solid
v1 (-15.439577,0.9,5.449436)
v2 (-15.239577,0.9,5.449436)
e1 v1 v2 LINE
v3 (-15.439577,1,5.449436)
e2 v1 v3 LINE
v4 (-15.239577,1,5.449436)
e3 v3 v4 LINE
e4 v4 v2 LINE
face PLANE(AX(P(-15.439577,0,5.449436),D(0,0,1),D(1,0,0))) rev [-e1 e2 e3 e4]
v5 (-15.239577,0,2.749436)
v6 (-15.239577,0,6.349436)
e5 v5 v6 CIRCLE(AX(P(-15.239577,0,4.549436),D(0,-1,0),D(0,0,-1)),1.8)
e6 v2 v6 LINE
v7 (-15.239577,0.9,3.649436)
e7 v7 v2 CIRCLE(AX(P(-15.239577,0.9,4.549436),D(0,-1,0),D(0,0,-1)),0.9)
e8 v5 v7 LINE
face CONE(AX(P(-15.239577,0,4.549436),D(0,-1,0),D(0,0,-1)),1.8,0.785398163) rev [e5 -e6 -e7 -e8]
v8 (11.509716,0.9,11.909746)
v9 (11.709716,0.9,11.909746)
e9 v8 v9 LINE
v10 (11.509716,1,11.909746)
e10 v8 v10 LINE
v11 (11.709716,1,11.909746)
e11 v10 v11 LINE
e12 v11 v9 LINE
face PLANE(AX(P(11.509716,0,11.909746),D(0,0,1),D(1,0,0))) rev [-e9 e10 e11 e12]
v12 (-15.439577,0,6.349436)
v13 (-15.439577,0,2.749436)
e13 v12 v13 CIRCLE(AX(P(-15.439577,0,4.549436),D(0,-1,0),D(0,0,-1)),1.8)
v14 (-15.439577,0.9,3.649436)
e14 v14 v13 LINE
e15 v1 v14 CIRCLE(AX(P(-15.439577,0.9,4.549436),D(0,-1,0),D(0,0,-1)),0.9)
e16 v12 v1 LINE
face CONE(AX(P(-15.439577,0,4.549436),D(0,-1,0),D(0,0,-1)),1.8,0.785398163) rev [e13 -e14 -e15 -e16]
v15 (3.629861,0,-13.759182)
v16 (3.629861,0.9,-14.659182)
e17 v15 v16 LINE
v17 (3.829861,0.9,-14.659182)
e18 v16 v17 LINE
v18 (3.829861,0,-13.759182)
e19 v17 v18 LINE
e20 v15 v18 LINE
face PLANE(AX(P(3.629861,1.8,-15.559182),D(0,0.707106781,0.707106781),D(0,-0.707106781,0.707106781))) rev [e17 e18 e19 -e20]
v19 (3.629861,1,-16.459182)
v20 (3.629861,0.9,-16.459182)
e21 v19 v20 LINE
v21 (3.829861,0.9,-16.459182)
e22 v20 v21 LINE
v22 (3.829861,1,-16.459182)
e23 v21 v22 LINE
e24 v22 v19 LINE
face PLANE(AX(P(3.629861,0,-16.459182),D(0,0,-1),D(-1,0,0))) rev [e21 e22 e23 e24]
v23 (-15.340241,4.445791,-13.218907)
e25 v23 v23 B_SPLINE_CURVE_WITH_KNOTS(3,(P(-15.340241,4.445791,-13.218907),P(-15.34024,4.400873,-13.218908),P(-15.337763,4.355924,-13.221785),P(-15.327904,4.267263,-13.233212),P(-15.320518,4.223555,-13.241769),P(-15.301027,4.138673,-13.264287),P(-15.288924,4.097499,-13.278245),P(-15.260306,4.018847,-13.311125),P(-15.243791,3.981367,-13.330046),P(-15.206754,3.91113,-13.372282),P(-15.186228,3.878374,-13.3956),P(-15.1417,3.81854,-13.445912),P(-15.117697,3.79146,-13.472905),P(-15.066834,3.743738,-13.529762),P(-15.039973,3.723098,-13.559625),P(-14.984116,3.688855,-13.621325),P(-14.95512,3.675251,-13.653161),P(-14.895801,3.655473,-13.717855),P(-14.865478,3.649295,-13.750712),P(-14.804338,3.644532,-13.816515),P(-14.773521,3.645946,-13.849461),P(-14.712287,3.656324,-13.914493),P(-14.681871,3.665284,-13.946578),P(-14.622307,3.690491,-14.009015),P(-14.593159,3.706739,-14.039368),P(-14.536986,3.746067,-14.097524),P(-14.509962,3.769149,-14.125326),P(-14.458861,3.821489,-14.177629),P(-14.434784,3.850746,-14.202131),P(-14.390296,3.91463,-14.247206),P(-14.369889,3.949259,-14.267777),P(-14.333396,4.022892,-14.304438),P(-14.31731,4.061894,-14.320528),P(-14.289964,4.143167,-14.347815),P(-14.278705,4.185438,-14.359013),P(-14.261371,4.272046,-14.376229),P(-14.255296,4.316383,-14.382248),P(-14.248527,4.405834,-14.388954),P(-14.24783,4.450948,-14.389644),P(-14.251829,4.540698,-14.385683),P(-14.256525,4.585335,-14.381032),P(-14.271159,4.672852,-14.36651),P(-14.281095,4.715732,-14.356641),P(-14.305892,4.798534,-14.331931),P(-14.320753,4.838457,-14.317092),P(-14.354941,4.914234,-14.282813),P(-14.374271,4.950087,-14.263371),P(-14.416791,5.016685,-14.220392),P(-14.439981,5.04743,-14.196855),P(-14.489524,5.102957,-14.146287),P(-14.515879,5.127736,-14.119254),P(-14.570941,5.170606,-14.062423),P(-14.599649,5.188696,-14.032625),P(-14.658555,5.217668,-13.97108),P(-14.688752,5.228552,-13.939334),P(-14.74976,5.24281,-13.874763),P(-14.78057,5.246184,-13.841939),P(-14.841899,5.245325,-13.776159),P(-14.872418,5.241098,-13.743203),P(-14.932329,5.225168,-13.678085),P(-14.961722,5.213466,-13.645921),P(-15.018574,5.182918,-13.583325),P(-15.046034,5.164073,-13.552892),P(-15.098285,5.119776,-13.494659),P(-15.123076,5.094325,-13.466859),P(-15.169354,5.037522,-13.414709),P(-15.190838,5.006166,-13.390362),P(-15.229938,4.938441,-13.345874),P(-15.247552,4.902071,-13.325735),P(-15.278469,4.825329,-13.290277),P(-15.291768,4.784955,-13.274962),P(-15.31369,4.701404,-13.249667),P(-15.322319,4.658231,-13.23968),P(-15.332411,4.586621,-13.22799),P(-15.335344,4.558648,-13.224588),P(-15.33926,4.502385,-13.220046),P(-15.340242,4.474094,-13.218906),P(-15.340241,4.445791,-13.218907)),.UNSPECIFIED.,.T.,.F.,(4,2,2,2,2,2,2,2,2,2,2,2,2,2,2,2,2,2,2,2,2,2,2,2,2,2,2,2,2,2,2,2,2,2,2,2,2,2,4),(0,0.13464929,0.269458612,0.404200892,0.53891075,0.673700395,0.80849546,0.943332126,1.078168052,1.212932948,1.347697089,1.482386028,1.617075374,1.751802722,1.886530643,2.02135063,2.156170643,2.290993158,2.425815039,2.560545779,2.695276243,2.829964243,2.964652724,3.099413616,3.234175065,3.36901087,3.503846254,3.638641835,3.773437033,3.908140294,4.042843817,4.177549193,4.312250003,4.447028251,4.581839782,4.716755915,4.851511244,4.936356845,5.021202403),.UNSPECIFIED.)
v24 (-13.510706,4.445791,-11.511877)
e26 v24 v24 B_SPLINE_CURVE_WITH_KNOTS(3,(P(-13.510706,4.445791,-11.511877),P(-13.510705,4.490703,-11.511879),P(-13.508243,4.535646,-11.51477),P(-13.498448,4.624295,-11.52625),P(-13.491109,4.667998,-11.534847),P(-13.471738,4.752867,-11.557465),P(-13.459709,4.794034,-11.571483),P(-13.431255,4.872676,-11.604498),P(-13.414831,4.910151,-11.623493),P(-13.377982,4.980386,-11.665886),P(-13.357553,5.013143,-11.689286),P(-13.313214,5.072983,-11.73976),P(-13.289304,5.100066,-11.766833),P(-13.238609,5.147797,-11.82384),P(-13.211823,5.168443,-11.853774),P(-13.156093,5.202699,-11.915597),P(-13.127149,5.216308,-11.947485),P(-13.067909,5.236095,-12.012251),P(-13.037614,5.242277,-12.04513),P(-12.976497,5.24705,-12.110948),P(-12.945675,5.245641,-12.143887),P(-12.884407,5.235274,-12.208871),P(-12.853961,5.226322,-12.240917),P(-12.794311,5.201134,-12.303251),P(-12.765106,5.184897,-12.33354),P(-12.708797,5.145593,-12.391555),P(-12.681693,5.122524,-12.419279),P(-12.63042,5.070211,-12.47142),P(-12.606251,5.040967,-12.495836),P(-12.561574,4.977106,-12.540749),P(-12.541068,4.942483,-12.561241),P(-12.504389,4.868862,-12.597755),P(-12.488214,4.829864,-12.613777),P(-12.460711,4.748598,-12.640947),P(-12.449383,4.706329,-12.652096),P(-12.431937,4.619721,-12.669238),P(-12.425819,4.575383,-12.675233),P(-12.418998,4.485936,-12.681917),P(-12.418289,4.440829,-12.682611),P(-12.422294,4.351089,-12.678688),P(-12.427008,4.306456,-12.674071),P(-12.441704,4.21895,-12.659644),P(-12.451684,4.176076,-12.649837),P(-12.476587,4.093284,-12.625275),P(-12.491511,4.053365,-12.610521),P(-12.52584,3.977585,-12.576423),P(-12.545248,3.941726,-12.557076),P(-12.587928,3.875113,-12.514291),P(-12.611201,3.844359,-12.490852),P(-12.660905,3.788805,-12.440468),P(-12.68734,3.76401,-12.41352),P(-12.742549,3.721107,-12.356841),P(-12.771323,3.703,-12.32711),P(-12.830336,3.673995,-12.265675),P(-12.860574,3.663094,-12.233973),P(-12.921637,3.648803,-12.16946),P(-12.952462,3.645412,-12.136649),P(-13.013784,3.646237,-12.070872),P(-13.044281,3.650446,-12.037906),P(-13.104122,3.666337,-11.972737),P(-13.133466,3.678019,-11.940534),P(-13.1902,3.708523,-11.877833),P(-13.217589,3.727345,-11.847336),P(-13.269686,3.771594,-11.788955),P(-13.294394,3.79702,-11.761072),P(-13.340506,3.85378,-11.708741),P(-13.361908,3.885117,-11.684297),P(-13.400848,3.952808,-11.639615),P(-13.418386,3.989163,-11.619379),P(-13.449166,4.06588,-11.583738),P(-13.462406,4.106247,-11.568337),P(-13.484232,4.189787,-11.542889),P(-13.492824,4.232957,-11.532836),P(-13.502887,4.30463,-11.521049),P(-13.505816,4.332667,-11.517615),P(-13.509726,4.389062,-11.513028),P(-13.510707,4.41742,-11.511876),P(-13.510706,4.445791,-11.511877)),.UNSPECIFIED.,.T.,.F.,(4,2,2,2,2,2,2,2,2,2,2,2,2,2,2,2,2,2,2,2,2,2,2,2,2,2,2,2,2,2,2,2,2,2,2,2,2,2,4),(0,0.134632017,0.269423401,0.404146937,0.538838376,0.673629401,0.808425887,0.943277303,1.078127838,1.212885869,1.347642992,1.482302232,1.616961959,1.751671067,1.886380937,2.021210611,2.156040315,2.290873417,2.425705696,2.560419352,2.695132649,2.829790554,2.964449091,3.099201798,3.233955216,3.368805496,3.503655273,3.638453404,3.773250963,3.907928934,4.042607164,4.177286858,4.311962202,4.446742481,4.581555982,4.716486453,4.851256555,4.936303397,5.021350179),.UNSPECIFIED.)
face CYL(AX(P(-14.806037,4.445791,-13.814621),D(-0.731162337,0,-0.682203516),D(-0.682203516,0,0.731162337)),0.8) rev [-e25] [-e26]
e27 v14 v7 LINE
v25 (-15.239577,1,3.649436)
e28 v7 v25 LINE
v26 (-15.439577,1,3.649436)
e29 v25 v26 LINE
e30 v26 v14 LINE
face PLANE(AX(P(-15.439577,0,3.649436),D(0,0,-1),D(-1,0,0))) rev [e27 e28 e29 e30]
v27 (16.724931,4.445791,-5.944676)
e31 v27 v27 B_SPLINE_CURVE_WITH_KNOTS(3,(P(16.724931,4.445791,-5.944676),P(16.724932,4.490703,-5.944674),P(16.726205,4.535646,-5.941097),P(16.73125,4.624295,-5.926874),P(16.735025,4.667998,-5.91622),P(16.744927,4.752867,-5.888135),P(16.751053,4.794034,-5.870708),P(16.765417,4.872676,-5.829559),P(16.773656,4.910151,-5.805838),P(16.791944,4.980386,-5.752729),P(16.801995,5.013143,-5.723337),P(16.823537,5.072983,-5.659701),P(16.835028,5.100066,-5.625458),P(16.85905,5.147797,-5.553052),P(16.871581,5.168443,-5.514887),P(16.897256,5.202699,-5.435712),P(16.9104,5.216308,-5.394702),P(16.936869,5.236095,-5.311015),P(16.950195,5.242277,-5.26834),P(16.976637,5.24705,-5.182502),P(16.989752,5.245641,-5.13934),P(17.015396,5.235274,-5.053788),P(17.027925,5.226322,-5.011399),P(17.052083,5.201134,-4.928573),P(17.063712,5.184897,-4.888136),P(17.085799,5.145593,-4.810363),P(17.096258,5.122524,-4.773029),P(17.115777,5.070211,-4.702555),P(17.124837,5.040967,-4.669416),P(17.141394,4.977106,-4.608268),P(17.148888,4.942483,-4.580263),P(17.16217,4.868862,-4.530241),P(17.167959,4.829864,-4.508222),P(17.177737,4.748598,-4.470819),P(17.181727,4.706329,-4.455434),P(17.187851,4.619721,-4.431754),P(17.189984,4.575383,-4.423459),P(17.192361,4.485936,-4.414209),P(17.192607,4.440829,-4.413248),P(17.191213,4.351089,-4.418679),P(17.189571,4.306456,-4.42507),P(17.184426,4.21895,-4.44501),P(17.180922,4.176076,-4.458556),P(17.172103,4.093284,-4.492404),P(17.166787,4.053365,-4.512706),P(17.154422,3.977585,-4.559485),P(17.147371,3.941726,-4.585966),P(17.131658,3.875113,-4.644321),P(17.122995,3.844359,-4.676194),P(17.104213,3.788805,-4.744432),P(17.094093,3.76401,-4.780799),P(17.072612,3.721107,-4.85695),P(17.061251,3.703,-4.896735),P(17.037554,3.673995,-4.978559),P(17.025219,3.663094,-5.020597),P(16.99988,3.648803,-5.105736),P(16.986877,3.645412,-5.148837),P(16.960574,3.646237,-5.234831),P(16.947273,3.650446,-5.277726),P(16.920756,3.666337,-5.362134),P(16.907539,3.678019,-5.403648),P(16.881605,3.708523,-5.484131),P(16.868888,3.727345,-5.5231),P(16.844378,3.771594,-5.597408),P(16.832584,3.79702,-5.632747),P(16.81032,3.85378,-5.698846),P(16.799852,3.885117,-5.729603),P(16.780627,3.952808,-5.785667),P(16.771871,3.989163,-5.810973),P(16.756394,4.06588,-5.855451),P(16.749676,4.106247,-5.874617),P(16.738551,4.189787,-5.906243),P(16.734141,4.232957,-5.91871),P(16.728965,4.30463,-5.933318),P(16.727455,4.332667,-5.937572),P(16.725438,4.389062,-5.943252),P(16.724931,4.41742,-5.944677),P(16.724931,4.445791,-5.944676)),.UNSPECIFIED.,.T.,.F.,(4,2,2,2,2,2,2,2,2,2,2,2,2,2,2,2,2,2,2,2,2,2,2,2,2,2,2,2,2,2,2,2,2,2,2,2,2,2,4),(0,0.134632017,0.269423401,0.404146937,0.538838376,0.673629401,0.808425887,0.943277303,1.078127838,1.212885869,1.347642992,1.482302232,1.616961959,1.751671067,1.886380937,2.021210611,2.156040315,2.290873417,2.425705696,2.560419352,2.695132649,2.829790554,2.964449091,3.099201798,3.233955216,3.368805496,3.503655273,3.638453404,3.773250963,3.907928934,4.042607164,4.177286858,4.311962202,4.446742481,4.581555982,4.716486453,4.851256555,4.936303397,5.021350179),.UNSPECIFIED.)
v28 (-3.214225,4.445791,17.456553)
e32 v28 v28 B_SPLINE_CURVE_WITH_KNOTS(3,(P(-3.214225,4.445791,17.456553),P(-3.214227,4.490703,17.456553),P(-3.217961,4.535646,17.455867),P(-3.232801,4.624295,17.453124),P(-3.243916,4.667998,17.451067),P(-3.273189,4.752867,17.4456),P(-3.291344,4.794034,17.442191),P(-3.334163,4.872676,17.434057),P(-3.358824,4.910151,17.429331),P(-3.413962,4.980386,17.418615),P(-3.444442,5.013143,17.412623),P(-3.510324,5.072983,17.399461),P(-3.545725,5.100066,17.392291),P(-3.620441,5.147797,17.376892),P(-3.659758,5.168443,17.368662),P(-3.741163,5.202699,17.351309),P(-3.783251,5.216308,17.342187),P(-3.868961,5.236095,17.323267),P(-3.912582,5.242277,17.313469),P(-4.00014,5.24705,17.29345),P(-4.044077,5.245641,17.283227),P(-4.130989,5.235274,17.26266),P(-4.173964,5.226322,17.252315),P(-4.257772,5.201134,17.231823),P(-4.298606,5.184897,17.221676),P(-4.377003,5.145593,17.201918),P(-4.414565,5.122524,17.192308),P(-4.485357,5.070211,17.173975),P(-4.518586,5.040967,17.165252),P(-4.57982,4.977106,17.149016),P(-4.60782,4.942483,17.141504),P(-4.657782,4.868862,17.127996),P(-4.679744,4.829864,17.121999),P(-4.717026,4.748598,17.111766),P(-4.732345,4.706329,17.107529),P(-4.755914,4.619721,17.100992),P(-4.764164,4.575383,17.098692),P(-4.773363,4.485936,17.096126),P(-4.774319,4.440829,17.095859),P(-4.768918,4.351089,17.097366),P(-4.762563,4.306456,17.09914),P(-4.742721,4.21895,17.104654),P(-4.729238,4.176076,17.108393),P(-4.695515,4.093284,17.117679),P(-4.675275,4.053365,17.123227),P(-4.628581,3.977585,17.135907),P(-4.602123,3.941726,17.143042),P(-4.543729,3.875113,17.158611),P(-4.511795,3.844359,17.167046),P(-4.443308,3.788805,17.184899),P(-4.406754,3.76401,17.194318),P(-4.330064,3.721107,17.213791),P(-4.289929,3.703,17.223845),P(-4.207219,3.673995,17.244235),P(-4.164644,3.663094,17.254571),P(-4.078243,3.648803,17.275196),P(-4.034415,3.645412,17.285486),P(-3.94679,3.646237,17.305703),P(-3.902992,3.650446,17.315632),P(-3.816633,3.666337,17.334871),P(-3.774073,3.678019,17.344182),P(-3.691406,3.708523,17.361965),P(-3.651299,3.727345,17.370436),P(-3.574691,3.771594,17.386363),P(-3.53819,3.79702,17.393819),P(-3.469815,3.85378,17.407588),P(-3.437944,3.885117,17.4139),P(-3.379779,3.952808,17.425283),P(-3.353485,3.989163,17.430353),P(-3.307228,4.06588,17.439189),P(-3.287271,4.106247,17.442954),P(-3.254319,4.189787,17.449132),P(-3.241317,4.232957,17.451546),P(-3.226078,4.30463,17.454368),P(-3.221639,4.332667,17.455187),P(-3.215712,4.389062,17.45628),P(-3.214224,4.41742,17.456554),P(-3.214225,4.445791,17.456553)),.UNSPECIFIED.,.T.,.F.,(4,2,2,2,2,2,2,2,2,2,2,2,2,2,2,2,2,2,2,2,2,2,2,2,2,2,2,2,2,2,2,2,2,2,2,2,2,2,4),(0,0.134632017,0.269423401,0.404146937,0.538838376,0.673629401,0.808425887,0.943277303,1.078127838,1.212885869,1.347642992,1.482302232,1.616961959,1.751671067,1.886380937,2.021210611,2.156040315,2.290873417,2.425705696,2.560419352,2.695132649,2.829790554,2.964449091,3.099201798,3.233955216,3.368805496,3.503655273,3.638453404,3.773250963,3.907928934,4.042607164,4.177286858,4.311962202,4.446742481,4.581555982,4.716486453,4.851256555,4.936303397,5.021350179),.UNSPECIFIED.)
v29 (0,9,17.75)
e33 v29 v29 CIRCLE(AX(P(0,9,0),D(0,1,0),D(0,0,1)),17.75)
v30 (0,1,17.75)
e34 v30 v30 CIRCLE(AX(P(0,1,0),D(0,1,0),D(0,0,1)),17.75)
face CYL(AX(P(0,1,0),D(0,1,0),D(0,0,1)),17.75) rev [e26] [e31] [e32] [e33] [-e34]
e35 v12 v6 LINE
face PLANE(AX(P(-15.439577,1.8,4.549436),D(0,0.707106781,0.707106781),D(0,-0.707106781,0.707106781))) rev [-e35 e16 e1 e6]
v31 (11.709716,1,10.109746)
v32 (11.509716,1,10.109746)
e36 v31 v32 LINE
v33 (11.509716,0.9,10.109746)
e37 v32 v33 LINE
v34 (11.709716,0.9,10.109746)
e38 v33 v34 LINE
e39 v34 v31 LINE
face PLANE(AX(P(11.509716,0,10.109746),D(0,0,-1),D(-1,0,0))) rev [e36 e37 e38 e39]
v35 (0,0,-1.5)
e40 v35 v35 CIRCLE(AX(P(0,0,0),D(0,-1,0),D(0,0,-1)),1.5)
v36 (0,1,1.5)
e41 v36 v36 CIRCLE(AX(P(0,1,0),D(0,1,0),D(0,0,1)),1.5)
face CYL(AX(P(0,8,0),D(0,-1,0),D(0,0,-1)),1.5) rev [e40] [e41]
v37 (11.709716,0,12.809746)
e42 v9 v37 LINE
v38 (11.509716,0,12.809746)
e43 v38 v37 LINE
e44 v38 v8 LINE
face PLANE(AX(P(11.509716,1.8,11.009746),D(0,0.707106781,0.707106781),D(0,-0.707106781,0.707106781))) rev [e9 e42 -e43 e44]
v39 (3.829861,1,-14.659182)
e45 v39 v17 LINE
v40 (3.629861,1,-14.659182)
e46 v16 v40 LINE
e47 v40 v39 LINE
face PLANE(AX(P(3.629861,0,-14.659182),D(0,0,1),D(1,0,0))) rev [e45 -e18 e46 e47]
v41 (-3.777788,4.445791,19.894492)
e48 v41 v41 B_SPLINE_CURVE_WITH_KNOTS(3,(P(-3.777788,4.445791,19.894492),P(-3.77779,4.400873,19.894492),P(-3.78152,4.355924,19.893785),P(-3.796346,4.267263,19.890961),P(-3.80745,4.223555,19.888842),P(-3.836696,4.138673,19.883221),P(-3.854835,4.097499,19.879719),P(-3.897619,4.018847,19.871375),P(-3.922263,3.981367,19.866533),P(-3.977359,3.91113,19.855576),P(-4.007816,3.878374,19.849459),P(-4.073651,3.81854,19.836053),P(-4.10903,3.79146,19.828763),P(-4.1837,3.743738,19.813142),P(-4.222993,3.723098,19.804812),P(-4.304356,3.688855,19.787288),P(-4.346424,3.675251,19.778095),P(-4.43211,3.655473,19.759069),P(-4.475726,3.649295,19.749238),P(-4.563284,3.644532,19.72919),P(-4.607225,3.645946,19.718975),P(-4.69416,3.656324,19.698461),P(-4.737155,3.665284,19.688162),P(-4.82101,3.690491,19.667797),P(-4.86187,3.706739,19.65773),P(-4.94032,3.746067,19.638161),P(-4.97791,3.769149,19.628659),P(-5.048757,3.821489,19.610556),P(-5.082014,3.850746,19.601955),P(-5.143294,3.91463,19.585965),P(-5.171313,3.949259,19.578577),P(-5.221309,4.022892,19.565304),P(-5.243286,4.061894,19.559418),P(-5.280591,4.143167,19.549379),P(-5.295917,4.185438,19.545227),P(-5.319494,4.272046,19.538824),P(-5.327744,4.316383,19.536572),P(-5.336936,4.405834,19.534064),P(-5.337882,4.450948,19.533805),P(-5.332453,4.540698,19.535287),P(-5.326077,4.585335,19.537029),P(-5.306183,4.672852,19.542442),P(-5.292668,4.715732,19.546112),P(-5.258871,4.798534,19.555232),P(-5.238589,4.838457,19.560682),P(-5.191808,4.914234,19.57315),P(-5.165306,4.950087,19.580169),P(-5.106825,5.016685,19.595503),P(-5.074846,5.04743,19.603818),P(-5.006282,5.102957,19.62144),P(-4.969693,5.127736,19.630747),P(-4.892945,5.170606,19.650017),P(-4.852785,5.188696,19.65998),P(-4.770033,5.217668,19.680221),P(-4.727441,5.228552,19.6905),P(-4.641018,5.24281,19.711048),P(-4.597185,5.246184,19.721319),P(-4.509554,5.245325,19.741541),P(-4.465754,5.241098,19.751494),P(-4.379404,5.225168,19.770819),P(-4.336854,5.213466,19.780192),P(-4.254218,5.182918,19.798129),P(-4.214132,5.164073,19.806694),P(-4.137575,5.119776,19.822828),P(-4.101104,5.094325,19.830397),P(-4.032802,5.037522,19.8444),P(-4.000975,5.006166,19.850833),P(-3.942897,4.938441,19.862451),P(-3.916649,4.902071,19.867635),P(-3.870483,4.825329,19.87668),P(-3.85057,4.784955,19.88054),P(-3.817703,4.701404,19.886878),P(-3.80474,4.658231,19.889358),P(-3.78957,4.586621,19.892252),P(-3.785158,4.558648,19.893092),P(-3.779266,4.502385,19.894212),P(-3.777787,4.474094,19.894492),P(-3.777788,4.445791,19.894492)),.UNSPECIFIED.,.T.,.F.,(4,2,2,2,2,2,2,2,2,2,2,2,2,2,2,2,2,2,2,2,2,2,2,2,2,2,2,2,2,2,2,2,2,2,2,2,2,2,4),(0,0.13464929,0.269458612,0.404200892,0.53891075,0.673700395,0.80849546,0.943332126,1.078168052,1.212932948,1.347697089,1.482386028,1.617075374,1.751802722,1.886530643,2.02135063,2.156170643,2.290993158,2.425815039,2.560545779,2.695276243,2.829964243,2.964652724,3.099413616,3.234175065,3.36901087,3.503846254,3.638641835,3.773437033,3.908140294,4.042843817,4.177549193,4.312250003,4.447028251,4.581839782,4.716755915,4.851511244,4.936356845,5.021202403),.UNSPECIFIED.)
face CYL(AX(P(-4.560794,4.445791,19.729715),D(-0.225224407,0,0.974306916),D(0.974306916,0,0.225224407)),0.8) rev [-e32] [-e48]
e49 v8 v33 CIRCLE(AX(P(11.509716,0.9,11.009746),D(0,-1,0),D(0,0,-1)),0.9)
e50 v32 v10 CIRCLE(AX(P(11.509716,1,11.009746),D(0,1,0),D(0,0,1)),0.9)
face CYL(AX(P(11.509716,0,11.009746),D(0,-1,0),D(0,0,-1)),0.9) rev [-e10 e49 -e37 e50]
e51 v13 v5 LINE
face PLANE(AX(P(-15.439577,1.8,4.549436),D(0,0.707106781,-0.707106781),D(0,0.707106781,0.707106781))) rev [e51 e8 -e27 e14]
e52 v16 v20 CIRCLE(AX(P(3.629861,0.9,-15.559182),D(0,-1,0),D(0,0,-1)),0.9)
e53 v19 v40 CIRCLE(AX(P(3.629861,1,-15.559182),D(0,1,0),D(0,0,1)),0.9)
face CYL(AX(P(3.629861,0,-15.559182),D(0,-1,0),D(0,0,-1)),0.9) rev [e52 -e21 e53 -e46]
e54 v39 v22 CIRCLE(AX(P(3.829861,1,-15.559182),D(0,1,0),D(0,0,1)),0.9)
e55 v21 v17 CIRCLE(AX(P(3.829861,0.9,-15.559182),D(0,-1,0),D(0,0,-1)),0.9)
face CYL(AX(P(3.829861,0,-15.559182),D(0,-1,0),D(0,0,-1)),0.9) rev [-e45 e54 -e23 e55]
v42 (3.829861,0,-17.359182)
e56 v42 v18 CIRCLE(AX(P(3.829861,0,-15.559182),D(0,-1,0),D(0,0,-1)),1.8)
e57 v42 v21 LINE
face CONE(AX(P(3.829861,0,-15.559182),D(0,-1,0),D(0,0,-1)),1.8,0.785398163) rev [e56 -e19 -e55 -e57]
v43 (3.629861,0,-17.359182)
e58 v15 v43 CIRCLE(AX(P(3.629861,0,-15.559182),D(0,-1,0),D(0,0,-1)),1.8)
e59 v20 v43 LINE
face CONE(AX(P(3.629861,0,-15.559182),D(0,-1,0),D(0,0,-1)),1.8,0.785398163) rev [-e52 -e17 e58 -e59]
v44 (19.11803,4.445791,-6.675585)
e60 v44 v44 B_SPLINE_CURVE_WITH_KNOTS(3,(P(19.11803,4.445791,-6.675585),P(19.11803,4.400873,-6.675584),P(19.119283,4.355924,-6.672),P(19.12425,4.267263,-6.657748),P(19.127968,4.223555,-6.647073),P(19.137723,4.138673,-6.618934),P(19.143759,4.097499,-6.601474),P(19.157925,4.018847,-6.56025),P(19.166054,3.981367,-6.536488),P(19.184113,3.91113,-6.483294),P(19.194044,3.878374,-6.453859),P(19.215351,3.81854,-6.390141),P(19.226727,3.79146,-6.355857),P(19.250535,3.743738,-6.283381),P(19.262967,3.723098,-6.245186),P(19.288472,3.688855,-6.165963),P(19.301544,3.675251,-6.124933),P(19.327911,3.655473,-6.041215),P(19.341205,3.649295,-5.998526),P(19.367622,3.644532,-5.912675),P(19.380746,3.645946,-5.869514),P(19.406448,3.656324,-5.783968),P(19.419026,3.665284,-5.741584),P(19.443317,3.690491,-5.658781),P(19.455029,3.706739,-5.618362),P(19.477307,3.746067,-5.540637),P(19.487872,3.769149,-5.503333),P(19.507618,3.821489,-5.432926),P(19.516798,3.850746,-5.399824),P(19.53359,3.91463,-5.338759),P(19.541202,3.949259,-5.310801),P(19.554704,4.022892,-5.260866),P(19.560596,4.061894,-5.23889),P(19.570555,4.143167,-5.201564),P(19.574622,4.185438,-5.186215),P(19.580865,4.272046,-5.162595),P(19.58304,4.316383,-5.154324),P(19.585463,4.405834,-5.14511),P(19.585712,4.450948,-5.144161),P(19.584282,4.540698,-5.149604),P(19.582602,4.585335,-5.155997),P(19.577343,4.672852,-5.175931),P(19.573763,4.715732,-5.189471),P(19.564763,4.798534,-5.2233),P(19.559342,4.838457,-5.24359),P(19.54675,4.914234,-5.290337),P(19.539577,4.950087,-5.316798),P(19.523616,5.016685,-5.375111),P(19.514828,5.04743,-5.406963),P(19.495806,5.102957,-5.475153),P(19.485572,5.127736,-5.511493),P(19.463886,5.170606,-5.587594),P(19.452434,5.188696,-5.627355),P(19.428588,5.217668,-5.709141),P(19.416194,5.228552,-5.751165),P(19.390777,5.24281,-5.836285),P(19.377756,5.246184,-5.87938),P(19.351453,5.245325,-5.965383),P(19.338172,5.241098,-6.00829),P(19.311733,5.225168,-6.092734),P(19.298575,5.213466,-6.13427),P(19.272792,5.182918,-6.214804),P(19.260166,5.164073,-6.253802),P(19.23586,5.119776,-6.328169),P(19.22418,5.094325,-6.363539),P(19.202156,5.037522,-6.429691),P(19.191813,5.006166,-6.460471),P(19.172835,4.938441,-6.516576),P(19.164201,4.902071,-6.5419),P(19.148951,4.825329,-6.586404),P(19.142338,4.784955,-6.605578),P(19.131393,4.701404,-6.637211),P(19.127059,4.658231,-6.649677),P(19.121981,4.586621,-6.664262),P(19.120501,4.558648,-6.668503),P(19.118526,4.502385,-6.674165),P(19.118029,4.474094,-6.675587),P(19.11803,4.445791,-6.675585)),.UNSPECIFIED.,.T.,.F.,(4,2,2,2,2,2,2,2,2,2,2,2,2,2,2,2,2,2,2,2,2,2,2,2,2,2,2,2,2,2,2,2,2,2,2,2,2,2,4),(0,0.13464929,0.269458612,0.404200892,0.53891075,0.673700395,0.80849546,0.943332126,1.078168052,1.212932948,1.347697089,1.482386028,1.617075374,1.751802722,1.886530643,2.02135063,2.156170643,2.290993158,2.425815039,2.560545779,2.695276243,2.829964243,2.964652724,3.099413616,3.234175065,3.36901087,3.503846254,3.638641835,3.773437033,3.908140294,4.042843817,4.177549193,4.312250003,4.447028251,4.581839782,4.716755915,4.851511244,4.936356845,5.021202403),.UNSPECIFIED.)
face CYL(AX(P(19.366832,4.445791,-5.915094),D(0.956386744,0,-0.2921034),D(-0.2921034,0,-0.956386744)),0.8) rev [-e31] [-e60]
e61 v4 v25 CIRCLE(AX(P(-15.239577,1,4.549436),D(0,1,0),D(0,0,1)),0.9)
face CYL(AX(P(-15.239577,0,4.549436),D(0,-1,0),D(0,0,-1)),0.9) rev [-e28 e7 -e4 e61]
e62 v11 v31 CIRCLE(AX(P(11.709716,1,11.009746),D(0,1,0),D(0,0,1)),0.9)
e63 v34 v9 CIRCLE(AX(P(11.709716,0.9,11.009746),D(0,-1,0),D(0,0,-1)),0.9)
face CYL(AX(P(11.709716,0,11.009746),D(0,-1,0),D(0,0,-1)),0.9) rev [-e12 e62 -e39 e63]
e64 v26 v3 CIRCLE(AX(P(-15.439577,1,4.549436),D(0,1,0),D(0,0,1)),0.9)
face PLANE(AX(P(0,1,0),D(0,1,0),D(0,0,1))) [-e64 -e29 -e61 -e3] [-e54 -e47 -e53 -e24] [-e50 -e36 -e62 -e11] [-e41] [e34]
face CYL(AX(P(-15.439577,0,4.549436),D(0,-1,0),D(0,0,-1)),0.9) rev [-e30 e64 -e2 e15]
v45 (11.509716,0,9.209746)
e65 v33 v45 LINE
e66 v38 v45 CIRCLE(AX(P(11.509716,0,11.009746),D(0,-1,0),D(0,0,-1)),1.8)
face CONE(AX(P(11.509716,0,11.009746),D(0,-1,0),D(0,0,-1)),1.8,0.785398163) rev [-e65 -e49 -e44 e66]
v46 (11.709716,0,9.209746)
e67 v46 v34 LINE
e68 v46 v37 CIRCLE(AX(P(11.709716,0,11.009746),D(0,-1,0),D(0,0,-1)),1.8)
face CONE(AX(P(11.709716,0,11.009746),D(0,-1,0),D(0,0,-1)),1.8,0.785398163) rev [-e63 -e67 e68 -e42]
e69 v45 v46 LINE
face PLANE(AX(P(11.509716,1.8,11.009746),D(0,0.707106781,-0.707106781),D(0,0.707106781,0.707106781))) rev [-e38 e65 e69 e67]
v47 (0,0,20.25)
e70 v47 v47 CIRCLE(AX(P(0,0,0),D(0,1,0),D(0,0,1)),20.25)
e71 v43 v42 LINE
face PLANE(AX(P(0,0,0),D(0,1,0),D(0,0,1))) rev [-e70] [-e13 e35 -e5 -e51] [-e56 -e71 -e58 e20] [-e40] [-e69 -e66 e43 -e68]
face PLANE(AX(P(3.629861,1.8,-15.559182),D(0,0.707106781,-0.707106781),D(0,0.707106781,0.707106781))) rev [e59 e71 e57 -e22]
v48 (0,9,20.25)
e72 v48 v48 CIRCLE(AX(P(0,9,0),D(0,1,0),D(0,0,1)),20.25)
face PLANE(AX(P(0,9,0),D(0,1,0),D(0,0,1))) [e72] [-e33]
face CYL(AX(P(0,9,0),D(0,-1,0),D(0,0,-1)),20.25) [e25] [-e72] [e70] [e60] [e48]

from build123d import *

# Parameters (mm, degrees)
SKETCH1_R                                     = 20.25
BOSS_EXTRUDE1_DEPTH                           = 9
SKETCH2_R                                     = 17.75
CUT_EXTRUDE1_DEPTH                            = 8
CSK_START                                     = -1
CSK_SLOT_FOR_M1_6_COUNTERSUNK_FLAT_HEAD_DEPTH = 3
CIRPATTERN1_START                             = -1
CIRPATTERN1_DEPTH                             = 3
SKETCH5_R                                     = 1.5
CUT_EXTRUDE2_DEPTH                            = 8
CIRPATTERN2_COUNT                             = 3


with BuildPart() as part:
    # Sketch1 → Boss-Extrude1 (new body)
    with BuildSketch(Plane(origin=(0, 0, 0), x_dir=(1, 0, 0), z_dir=(0, 1, 0))):
        with Locations(Location((0, 0, 0), (0, 0, 270))):
            Circle(SKETCH1_R)
    extrude(amount=BOSS_EXTRUDE1_DEPTH)

    # Sketch2 → Cut-Extrude1 (cut)
    with BuildSketch(Plane(origin=(0, 9, 0), x_dir=(1, 0, 0), z_dir=(0, 1, 0))):
        with Locations(Location((0, 0, 0), (0, 0, 270))):
            Circle(SKETCH2_R)
    extrude(amount=-CUT_EXTRUDE1_DEPTH, mode=Mode.SUBTRACT)

    # CSK SLOT for M1.6 Countersunk Flat Head: read off the stored shape, not the designer's step
    # CSK SLOT for M1.6 Countersunk Flat H 2 → CSK SLOT for M1.6 Countersunk Flat Head (cut)
    with BuildSketch(Plane(origin=(0, 0, 0), x_dir=(1, 0, 0), z_dir=(0, 1, 0)).offset(CSK_START)):
        with BuildLine():
            ThreePointArc((11.709715894, -11.90974554), (12.609715894, -11.00974554), (11.709715894, -10.10974554))
            Line((11.709715894, -10.10974554), (11.509715894, -10.10974554))
            ThreePointArc((11.509715894, -10.10974554), (10.609715894, -11.00974554), (11.509715894, -11.90974554))
            Line((11.509715894, -11.90974554), (11.709715894, -11.90974554))
        make_face()
    extrude(amount=CSK_SLOT_FOR_M1_6_COUNTERSUNK_FLAT_HEAD_DEPTH, mode=Mode.SUBTRACT)

    # CSK SLOT for M1.6 Countersunk Flat H 3: loft between two sections, ruled curve by curve
    csk_slot_for_m1_6_countersunk_flat_h_3_from = [
        Edge.make_three_point_arc((11.709715894, 0.9, 10.10974554), (12.346111997, 0.9, 10.373349437), (12.609715894, 0.9, 11.00974554)),
        Edge.make_three_point_arc((12.609715894, 0.9, 11.00974554), (12.346111997, 0.9, 11.646141643), (11.709715894, 0.9, 11.90974554)),
        Edge.make_three_point_arc((11.509715894, 0.9, 11.90974554), (10.873319791, 0.9, 11.646141643), (10.609715894, 0.9, 11.00974554)),
        Edge.make_three_point_arc((10.609715894, 0.9, 11.00974554), (10.873319791, 0.9, 10.373349437), (11.509715894, 0.9, 10.10974554)),
        Edge.make_line((11.709715894, 0.9, 11.90974554), (11.509715894, 0.9, 11.90974554)),
        Edge.make_line((11.709715894, 0.9, 10.10974554), (11.509715894, 0.9, 10.10974554)),
    ]
    csk_slot_for_m1_6_countersunk_flat_h_3_to = [
        Edge.make_three_point_arc((11.709715894, 0, 9.20974554), (12.9825081, 0, 9.736953334), (13.509715894, 0, 11.00974554)),
        Edge.make_three_point_arc((13.509715894, 0, 11.00974554), (12.9825081, 0, 12.282537747), (11.709715894, 0, 12.80974554)),
        Edge.make_three_point_arc((11.509715894, 0, 12.80974554), (10.236923688, 0, 12.282537747), (9.709715894, 0, 11.00974554)),
        Edge.make_three_point_arc((9.709715894, 0, 11.00974554), (10.236923688, 0, 9.736953334), (11.509715894, 0, 9.20974554)),
        Edge.make_line((11.709715894, 0, 12.80974554), (11.509715894, 0, 12.80974554)),
        Edge.make_line((11.709715894, 0, 9.20974554), (11.509715894, 0, 9.20974554)),
    ]
    csk_slot_for_m1_6_countersunk_flat_h_3 = Solid(Shell([*[Face.make_surface_from_curves(csk_slot_for_m1_6_countersunk_flat_h_3_from[k], csk_slot_for_m1_6_countersunk_flat_h_3_to[k]) for k in range(6)], Face(Wire(csk_slot_for_m1_6_countersunk_flat_h_3_from)), Face(Wire(csk_slot_for_m1_6_countersunk_flat_h_3_to))]))
    add(csk_slot_for_m1_6_countersunk_flat_h_3, mode=Mode.SUBTRACT)

    # CirPattern1: read off the stored shape, not the designer's step
    # CirPattern1 outline → CirPattern1 (cut)
    with BuildSketch(Plane(origin=(0, 0, 0), x_dir=(1, 0, 0), z_dir=(0, 1, 0)).offset(CIRPATTERN1_START)):
        with BuildLine():
            ThreePointArc((-15.239577274, -5.449436125), (-14.339577274, -4.549436125), (-15.239577274, -3.649436125))
            Line((-15.239577274, -3.649436125), (-15.439577274, -3.649436125))
            ThreePointArc((-15.439577274, -3.649436125), (-16.339577274, -4.549436125), (-15.439577274, -5.449436125))
            Line((-15.439577274, -5.449436125), (-15.239577274, -5.449436125))
        make_face()
        with BuildLine():
            ThreePointArc((3.82986138, 14.659181665), (4.72986138, 15.559181665), (3.82986138, 16.459181665))
            Line((3.82986138, 16.459181665), (3.62986138, 16.459181665))
            ThreePointArc((3.62986138, 16.459181665), (2.72986138, 15.559181665), (3.62986138, 14.659181665))
            Line((3.62986138, 14.659181665), (3.82986138, 14.659181665))
        make_face()
    extrude(amount=CIRPATTERN1_DEPTH, mode=Mode.SUBTRACT)

    # CirPattern1 2: loft between two sections, ruled curve by curve
    cirpattern1_2_from = [
        Edge.make_three_point_arc((-15.239577274, 0.9, 3.649436125), (-14.603181171, 0.9, 3.913040022), (-14.339577274, 0.9, 4.549436125)),
        Edge.make_three_point_arc((-14.339577274, 0.9, 4.549436125), (-14.603181171, 0.9, 5.185832228), (-15.239577274, 0.9, 5.449436125)),
        Edge.make_three_point_arc((-15.439577274, 0.9, 5.449436125), (-16.075973377, 0.9, 5.185832228), (-16.339577274, 0.9, 4.549436125)),
        Edge.make_three_point_arc((-16.339577274, 0.9, 4.549436125), (-16.075973377, 0.9, 3.913040022), (-15.439577274, 0.9, 3.649436125)),
        Edge.make_line((-15.239577274, 0.9, 5.449436125), (-15.439577274, 0.9, 5.449436125)),
        Edge.make_line((-15.239577274, 0.9, 3.649436125), (-15.439577274, 0.9, 3.649436125)),
    ]
    cirpattern1_2_to = [
        Edge.make_three_point_arc((-15.239577274, 0, 2.749436125), (-13.966785068, 0, 3.276643918), (-13.439577274, 0, 4.549436125)),
        Edge.make_three_point_arc((-13.439577274, 0, 4.549436125), (-13.966785068, 0, 5.822228331), (-15.239577274, 0, 6.349436125)),
        Edge.make_three_point_arc((-15.439577274, 0, 6.349436125), (-16.71236948, 0, 5.822228331), (-17.239577274, 0, 4.549436125)),
        Edge.make_three_point_arc((-17.239577274, 0, 4.549436125), (-16.71236948, 0, 3.276643918), (-15.439577274, 0, 2.749436125)),
        Edge.make_line((-15.239577274, 0, 6.349436125), (-15.439577274, 0, 6.349436125)),
        Edge.make_line((-15.239577274, 0, 2.749436125), (-15.439577274, 0, 2.749436125)),
    ]
    cirpattern1_2 = Solid(Shell([*[Face.make_surface_from_curves(cirpattern1_2_from[k], cirpattern1_2_to[k]) for k in range(6)], Face(Wire(cirpattern1_2_from)), Face(Wire(cirpattern1_2_to))]))
    add(cirpattern1_2, mode=Mode.SUBTRACT)

    # CirPattern1 3: loft between two sections, ruled curve by curve
    cirpattern1_3_from = [
        Edge.make_three_point_arc((3.82986138, 0.9, -16.459181665), (4.466257483, 0.9, -16.195577768), (4.72986138, 0.9, -15.559181665)),
        Edge.make_three_point_arc((4.72986138, 0.9, -15.559181665), (4.466257483, 0.9, -14.922785562), (3.82986138, 0.9, -14.659181665)),
        Edge.make_three_point_arc((3.62986138, 0.9, -14.659181665), (2.993465277, 0.9, -14.922785562), (2.72986138, 0.9, -15.559181665)),
        Edge.make_three_point_arc((2.72986138, 0.9, -15.559181665), (2.993465277, 0.9, -16.195577768), (3.62986138, 0.9, -16.459181665)),
        Edge.make_line((3.82986138, 0.9, -14.659181665), (3.62986138, 0.9, -14.659181665)),
        Edge.make_line((3.82986138, 0.9, -16.459181665), (3.62986138, 0.9, -16.459181665)),
    ]
    cirpattern1_3_to = [
        Edge.make_three_point_arc((3.82986138, 0, -17.359181665), (5.102653586, 0, -16.831973871), (5.62986138, 0, -15.559181665)),
        Edge.make_three_point_arc((5.62986138, 0, -15.559181665), (5.102653586, 0, -14.286389459), (3.82986138, 0, -13.759181665)),
        Edge.make_three_point_arc((3.62986138, 0, -13.759181665), (2.357069174, 0, -14.286389459), (1.82986138, 0, -15.559181665)),
        Edge.make_three_point_arc((1.82986138, 0, -15.559181665), (2.357069174, 0, -16.831973871), (3.62986138, 0, -17.359181665)),
        Edge.make_line((3.82986138, 0, -13.759181665), (3.62986138, 0, -13.759181665)),
        Edge.make_line((3.82986138, 0, -17.359181665), (3.62986138, 0, -17.359181665)),
    ]
    cirpattern1_3 = Solid(Shell([*[Face.make_surface_from_curves(cirpattern1_3_from[k], cirpattern1_3_to[k]) for k in range(6)], Face(Wire(cirpattern1_3_from)), Face(Wire(cirpattern1_3_to))]))
    add(cirpattern1_3, mode=Mode.SUBTRACT)

    # Sketch5 → Cut-Extrude2 (cut)
    with BuildSketch(Plane.XZ):
        with Locations(Location((0, 0, 0), (0, 0, 270))):
            Circle(SKETCH5_R)
    extrude(amount=-CUT_EXTRUDE2_DEPTH, mode=Mode.SUBTRACT)

    # Sketch6 → M2 Tapped Hole1 (revolve, cut)
    with BuildSketch(Plane(origin=(-4.560794248, 4.445790719, 19.729715047), x_dir=(0.974306915892993, 0, 0.22522440729877435), z_dir=(0, 1, 0))):
        Polygon((0, 0), (0, 4.980688495), (0.8, 4.5), (0.8, 0), align=None)
    m2_tapped_hole1 = revolve(axis=Axis((-5.990969234, 4.445790719, 25.916563963), (0.22522440729877433, 0, -0.9743069158929931)), mode=Mode.SUBTRACT)

    # CirPattern2: M2 Tapped Hole1 ×3 about axis
    cirpattern2_axis = Axis((0, 9, 0), (0, -1, 0))
    for i in range(1, CIRPATTERN2_COUNT):
        add(m2_tapped_hole1.rotate(cirpattern2_axis, i * 360 / CIRPATTERN2_COUNT), mode=Mode.SUBTRACT)


solid = part.part
